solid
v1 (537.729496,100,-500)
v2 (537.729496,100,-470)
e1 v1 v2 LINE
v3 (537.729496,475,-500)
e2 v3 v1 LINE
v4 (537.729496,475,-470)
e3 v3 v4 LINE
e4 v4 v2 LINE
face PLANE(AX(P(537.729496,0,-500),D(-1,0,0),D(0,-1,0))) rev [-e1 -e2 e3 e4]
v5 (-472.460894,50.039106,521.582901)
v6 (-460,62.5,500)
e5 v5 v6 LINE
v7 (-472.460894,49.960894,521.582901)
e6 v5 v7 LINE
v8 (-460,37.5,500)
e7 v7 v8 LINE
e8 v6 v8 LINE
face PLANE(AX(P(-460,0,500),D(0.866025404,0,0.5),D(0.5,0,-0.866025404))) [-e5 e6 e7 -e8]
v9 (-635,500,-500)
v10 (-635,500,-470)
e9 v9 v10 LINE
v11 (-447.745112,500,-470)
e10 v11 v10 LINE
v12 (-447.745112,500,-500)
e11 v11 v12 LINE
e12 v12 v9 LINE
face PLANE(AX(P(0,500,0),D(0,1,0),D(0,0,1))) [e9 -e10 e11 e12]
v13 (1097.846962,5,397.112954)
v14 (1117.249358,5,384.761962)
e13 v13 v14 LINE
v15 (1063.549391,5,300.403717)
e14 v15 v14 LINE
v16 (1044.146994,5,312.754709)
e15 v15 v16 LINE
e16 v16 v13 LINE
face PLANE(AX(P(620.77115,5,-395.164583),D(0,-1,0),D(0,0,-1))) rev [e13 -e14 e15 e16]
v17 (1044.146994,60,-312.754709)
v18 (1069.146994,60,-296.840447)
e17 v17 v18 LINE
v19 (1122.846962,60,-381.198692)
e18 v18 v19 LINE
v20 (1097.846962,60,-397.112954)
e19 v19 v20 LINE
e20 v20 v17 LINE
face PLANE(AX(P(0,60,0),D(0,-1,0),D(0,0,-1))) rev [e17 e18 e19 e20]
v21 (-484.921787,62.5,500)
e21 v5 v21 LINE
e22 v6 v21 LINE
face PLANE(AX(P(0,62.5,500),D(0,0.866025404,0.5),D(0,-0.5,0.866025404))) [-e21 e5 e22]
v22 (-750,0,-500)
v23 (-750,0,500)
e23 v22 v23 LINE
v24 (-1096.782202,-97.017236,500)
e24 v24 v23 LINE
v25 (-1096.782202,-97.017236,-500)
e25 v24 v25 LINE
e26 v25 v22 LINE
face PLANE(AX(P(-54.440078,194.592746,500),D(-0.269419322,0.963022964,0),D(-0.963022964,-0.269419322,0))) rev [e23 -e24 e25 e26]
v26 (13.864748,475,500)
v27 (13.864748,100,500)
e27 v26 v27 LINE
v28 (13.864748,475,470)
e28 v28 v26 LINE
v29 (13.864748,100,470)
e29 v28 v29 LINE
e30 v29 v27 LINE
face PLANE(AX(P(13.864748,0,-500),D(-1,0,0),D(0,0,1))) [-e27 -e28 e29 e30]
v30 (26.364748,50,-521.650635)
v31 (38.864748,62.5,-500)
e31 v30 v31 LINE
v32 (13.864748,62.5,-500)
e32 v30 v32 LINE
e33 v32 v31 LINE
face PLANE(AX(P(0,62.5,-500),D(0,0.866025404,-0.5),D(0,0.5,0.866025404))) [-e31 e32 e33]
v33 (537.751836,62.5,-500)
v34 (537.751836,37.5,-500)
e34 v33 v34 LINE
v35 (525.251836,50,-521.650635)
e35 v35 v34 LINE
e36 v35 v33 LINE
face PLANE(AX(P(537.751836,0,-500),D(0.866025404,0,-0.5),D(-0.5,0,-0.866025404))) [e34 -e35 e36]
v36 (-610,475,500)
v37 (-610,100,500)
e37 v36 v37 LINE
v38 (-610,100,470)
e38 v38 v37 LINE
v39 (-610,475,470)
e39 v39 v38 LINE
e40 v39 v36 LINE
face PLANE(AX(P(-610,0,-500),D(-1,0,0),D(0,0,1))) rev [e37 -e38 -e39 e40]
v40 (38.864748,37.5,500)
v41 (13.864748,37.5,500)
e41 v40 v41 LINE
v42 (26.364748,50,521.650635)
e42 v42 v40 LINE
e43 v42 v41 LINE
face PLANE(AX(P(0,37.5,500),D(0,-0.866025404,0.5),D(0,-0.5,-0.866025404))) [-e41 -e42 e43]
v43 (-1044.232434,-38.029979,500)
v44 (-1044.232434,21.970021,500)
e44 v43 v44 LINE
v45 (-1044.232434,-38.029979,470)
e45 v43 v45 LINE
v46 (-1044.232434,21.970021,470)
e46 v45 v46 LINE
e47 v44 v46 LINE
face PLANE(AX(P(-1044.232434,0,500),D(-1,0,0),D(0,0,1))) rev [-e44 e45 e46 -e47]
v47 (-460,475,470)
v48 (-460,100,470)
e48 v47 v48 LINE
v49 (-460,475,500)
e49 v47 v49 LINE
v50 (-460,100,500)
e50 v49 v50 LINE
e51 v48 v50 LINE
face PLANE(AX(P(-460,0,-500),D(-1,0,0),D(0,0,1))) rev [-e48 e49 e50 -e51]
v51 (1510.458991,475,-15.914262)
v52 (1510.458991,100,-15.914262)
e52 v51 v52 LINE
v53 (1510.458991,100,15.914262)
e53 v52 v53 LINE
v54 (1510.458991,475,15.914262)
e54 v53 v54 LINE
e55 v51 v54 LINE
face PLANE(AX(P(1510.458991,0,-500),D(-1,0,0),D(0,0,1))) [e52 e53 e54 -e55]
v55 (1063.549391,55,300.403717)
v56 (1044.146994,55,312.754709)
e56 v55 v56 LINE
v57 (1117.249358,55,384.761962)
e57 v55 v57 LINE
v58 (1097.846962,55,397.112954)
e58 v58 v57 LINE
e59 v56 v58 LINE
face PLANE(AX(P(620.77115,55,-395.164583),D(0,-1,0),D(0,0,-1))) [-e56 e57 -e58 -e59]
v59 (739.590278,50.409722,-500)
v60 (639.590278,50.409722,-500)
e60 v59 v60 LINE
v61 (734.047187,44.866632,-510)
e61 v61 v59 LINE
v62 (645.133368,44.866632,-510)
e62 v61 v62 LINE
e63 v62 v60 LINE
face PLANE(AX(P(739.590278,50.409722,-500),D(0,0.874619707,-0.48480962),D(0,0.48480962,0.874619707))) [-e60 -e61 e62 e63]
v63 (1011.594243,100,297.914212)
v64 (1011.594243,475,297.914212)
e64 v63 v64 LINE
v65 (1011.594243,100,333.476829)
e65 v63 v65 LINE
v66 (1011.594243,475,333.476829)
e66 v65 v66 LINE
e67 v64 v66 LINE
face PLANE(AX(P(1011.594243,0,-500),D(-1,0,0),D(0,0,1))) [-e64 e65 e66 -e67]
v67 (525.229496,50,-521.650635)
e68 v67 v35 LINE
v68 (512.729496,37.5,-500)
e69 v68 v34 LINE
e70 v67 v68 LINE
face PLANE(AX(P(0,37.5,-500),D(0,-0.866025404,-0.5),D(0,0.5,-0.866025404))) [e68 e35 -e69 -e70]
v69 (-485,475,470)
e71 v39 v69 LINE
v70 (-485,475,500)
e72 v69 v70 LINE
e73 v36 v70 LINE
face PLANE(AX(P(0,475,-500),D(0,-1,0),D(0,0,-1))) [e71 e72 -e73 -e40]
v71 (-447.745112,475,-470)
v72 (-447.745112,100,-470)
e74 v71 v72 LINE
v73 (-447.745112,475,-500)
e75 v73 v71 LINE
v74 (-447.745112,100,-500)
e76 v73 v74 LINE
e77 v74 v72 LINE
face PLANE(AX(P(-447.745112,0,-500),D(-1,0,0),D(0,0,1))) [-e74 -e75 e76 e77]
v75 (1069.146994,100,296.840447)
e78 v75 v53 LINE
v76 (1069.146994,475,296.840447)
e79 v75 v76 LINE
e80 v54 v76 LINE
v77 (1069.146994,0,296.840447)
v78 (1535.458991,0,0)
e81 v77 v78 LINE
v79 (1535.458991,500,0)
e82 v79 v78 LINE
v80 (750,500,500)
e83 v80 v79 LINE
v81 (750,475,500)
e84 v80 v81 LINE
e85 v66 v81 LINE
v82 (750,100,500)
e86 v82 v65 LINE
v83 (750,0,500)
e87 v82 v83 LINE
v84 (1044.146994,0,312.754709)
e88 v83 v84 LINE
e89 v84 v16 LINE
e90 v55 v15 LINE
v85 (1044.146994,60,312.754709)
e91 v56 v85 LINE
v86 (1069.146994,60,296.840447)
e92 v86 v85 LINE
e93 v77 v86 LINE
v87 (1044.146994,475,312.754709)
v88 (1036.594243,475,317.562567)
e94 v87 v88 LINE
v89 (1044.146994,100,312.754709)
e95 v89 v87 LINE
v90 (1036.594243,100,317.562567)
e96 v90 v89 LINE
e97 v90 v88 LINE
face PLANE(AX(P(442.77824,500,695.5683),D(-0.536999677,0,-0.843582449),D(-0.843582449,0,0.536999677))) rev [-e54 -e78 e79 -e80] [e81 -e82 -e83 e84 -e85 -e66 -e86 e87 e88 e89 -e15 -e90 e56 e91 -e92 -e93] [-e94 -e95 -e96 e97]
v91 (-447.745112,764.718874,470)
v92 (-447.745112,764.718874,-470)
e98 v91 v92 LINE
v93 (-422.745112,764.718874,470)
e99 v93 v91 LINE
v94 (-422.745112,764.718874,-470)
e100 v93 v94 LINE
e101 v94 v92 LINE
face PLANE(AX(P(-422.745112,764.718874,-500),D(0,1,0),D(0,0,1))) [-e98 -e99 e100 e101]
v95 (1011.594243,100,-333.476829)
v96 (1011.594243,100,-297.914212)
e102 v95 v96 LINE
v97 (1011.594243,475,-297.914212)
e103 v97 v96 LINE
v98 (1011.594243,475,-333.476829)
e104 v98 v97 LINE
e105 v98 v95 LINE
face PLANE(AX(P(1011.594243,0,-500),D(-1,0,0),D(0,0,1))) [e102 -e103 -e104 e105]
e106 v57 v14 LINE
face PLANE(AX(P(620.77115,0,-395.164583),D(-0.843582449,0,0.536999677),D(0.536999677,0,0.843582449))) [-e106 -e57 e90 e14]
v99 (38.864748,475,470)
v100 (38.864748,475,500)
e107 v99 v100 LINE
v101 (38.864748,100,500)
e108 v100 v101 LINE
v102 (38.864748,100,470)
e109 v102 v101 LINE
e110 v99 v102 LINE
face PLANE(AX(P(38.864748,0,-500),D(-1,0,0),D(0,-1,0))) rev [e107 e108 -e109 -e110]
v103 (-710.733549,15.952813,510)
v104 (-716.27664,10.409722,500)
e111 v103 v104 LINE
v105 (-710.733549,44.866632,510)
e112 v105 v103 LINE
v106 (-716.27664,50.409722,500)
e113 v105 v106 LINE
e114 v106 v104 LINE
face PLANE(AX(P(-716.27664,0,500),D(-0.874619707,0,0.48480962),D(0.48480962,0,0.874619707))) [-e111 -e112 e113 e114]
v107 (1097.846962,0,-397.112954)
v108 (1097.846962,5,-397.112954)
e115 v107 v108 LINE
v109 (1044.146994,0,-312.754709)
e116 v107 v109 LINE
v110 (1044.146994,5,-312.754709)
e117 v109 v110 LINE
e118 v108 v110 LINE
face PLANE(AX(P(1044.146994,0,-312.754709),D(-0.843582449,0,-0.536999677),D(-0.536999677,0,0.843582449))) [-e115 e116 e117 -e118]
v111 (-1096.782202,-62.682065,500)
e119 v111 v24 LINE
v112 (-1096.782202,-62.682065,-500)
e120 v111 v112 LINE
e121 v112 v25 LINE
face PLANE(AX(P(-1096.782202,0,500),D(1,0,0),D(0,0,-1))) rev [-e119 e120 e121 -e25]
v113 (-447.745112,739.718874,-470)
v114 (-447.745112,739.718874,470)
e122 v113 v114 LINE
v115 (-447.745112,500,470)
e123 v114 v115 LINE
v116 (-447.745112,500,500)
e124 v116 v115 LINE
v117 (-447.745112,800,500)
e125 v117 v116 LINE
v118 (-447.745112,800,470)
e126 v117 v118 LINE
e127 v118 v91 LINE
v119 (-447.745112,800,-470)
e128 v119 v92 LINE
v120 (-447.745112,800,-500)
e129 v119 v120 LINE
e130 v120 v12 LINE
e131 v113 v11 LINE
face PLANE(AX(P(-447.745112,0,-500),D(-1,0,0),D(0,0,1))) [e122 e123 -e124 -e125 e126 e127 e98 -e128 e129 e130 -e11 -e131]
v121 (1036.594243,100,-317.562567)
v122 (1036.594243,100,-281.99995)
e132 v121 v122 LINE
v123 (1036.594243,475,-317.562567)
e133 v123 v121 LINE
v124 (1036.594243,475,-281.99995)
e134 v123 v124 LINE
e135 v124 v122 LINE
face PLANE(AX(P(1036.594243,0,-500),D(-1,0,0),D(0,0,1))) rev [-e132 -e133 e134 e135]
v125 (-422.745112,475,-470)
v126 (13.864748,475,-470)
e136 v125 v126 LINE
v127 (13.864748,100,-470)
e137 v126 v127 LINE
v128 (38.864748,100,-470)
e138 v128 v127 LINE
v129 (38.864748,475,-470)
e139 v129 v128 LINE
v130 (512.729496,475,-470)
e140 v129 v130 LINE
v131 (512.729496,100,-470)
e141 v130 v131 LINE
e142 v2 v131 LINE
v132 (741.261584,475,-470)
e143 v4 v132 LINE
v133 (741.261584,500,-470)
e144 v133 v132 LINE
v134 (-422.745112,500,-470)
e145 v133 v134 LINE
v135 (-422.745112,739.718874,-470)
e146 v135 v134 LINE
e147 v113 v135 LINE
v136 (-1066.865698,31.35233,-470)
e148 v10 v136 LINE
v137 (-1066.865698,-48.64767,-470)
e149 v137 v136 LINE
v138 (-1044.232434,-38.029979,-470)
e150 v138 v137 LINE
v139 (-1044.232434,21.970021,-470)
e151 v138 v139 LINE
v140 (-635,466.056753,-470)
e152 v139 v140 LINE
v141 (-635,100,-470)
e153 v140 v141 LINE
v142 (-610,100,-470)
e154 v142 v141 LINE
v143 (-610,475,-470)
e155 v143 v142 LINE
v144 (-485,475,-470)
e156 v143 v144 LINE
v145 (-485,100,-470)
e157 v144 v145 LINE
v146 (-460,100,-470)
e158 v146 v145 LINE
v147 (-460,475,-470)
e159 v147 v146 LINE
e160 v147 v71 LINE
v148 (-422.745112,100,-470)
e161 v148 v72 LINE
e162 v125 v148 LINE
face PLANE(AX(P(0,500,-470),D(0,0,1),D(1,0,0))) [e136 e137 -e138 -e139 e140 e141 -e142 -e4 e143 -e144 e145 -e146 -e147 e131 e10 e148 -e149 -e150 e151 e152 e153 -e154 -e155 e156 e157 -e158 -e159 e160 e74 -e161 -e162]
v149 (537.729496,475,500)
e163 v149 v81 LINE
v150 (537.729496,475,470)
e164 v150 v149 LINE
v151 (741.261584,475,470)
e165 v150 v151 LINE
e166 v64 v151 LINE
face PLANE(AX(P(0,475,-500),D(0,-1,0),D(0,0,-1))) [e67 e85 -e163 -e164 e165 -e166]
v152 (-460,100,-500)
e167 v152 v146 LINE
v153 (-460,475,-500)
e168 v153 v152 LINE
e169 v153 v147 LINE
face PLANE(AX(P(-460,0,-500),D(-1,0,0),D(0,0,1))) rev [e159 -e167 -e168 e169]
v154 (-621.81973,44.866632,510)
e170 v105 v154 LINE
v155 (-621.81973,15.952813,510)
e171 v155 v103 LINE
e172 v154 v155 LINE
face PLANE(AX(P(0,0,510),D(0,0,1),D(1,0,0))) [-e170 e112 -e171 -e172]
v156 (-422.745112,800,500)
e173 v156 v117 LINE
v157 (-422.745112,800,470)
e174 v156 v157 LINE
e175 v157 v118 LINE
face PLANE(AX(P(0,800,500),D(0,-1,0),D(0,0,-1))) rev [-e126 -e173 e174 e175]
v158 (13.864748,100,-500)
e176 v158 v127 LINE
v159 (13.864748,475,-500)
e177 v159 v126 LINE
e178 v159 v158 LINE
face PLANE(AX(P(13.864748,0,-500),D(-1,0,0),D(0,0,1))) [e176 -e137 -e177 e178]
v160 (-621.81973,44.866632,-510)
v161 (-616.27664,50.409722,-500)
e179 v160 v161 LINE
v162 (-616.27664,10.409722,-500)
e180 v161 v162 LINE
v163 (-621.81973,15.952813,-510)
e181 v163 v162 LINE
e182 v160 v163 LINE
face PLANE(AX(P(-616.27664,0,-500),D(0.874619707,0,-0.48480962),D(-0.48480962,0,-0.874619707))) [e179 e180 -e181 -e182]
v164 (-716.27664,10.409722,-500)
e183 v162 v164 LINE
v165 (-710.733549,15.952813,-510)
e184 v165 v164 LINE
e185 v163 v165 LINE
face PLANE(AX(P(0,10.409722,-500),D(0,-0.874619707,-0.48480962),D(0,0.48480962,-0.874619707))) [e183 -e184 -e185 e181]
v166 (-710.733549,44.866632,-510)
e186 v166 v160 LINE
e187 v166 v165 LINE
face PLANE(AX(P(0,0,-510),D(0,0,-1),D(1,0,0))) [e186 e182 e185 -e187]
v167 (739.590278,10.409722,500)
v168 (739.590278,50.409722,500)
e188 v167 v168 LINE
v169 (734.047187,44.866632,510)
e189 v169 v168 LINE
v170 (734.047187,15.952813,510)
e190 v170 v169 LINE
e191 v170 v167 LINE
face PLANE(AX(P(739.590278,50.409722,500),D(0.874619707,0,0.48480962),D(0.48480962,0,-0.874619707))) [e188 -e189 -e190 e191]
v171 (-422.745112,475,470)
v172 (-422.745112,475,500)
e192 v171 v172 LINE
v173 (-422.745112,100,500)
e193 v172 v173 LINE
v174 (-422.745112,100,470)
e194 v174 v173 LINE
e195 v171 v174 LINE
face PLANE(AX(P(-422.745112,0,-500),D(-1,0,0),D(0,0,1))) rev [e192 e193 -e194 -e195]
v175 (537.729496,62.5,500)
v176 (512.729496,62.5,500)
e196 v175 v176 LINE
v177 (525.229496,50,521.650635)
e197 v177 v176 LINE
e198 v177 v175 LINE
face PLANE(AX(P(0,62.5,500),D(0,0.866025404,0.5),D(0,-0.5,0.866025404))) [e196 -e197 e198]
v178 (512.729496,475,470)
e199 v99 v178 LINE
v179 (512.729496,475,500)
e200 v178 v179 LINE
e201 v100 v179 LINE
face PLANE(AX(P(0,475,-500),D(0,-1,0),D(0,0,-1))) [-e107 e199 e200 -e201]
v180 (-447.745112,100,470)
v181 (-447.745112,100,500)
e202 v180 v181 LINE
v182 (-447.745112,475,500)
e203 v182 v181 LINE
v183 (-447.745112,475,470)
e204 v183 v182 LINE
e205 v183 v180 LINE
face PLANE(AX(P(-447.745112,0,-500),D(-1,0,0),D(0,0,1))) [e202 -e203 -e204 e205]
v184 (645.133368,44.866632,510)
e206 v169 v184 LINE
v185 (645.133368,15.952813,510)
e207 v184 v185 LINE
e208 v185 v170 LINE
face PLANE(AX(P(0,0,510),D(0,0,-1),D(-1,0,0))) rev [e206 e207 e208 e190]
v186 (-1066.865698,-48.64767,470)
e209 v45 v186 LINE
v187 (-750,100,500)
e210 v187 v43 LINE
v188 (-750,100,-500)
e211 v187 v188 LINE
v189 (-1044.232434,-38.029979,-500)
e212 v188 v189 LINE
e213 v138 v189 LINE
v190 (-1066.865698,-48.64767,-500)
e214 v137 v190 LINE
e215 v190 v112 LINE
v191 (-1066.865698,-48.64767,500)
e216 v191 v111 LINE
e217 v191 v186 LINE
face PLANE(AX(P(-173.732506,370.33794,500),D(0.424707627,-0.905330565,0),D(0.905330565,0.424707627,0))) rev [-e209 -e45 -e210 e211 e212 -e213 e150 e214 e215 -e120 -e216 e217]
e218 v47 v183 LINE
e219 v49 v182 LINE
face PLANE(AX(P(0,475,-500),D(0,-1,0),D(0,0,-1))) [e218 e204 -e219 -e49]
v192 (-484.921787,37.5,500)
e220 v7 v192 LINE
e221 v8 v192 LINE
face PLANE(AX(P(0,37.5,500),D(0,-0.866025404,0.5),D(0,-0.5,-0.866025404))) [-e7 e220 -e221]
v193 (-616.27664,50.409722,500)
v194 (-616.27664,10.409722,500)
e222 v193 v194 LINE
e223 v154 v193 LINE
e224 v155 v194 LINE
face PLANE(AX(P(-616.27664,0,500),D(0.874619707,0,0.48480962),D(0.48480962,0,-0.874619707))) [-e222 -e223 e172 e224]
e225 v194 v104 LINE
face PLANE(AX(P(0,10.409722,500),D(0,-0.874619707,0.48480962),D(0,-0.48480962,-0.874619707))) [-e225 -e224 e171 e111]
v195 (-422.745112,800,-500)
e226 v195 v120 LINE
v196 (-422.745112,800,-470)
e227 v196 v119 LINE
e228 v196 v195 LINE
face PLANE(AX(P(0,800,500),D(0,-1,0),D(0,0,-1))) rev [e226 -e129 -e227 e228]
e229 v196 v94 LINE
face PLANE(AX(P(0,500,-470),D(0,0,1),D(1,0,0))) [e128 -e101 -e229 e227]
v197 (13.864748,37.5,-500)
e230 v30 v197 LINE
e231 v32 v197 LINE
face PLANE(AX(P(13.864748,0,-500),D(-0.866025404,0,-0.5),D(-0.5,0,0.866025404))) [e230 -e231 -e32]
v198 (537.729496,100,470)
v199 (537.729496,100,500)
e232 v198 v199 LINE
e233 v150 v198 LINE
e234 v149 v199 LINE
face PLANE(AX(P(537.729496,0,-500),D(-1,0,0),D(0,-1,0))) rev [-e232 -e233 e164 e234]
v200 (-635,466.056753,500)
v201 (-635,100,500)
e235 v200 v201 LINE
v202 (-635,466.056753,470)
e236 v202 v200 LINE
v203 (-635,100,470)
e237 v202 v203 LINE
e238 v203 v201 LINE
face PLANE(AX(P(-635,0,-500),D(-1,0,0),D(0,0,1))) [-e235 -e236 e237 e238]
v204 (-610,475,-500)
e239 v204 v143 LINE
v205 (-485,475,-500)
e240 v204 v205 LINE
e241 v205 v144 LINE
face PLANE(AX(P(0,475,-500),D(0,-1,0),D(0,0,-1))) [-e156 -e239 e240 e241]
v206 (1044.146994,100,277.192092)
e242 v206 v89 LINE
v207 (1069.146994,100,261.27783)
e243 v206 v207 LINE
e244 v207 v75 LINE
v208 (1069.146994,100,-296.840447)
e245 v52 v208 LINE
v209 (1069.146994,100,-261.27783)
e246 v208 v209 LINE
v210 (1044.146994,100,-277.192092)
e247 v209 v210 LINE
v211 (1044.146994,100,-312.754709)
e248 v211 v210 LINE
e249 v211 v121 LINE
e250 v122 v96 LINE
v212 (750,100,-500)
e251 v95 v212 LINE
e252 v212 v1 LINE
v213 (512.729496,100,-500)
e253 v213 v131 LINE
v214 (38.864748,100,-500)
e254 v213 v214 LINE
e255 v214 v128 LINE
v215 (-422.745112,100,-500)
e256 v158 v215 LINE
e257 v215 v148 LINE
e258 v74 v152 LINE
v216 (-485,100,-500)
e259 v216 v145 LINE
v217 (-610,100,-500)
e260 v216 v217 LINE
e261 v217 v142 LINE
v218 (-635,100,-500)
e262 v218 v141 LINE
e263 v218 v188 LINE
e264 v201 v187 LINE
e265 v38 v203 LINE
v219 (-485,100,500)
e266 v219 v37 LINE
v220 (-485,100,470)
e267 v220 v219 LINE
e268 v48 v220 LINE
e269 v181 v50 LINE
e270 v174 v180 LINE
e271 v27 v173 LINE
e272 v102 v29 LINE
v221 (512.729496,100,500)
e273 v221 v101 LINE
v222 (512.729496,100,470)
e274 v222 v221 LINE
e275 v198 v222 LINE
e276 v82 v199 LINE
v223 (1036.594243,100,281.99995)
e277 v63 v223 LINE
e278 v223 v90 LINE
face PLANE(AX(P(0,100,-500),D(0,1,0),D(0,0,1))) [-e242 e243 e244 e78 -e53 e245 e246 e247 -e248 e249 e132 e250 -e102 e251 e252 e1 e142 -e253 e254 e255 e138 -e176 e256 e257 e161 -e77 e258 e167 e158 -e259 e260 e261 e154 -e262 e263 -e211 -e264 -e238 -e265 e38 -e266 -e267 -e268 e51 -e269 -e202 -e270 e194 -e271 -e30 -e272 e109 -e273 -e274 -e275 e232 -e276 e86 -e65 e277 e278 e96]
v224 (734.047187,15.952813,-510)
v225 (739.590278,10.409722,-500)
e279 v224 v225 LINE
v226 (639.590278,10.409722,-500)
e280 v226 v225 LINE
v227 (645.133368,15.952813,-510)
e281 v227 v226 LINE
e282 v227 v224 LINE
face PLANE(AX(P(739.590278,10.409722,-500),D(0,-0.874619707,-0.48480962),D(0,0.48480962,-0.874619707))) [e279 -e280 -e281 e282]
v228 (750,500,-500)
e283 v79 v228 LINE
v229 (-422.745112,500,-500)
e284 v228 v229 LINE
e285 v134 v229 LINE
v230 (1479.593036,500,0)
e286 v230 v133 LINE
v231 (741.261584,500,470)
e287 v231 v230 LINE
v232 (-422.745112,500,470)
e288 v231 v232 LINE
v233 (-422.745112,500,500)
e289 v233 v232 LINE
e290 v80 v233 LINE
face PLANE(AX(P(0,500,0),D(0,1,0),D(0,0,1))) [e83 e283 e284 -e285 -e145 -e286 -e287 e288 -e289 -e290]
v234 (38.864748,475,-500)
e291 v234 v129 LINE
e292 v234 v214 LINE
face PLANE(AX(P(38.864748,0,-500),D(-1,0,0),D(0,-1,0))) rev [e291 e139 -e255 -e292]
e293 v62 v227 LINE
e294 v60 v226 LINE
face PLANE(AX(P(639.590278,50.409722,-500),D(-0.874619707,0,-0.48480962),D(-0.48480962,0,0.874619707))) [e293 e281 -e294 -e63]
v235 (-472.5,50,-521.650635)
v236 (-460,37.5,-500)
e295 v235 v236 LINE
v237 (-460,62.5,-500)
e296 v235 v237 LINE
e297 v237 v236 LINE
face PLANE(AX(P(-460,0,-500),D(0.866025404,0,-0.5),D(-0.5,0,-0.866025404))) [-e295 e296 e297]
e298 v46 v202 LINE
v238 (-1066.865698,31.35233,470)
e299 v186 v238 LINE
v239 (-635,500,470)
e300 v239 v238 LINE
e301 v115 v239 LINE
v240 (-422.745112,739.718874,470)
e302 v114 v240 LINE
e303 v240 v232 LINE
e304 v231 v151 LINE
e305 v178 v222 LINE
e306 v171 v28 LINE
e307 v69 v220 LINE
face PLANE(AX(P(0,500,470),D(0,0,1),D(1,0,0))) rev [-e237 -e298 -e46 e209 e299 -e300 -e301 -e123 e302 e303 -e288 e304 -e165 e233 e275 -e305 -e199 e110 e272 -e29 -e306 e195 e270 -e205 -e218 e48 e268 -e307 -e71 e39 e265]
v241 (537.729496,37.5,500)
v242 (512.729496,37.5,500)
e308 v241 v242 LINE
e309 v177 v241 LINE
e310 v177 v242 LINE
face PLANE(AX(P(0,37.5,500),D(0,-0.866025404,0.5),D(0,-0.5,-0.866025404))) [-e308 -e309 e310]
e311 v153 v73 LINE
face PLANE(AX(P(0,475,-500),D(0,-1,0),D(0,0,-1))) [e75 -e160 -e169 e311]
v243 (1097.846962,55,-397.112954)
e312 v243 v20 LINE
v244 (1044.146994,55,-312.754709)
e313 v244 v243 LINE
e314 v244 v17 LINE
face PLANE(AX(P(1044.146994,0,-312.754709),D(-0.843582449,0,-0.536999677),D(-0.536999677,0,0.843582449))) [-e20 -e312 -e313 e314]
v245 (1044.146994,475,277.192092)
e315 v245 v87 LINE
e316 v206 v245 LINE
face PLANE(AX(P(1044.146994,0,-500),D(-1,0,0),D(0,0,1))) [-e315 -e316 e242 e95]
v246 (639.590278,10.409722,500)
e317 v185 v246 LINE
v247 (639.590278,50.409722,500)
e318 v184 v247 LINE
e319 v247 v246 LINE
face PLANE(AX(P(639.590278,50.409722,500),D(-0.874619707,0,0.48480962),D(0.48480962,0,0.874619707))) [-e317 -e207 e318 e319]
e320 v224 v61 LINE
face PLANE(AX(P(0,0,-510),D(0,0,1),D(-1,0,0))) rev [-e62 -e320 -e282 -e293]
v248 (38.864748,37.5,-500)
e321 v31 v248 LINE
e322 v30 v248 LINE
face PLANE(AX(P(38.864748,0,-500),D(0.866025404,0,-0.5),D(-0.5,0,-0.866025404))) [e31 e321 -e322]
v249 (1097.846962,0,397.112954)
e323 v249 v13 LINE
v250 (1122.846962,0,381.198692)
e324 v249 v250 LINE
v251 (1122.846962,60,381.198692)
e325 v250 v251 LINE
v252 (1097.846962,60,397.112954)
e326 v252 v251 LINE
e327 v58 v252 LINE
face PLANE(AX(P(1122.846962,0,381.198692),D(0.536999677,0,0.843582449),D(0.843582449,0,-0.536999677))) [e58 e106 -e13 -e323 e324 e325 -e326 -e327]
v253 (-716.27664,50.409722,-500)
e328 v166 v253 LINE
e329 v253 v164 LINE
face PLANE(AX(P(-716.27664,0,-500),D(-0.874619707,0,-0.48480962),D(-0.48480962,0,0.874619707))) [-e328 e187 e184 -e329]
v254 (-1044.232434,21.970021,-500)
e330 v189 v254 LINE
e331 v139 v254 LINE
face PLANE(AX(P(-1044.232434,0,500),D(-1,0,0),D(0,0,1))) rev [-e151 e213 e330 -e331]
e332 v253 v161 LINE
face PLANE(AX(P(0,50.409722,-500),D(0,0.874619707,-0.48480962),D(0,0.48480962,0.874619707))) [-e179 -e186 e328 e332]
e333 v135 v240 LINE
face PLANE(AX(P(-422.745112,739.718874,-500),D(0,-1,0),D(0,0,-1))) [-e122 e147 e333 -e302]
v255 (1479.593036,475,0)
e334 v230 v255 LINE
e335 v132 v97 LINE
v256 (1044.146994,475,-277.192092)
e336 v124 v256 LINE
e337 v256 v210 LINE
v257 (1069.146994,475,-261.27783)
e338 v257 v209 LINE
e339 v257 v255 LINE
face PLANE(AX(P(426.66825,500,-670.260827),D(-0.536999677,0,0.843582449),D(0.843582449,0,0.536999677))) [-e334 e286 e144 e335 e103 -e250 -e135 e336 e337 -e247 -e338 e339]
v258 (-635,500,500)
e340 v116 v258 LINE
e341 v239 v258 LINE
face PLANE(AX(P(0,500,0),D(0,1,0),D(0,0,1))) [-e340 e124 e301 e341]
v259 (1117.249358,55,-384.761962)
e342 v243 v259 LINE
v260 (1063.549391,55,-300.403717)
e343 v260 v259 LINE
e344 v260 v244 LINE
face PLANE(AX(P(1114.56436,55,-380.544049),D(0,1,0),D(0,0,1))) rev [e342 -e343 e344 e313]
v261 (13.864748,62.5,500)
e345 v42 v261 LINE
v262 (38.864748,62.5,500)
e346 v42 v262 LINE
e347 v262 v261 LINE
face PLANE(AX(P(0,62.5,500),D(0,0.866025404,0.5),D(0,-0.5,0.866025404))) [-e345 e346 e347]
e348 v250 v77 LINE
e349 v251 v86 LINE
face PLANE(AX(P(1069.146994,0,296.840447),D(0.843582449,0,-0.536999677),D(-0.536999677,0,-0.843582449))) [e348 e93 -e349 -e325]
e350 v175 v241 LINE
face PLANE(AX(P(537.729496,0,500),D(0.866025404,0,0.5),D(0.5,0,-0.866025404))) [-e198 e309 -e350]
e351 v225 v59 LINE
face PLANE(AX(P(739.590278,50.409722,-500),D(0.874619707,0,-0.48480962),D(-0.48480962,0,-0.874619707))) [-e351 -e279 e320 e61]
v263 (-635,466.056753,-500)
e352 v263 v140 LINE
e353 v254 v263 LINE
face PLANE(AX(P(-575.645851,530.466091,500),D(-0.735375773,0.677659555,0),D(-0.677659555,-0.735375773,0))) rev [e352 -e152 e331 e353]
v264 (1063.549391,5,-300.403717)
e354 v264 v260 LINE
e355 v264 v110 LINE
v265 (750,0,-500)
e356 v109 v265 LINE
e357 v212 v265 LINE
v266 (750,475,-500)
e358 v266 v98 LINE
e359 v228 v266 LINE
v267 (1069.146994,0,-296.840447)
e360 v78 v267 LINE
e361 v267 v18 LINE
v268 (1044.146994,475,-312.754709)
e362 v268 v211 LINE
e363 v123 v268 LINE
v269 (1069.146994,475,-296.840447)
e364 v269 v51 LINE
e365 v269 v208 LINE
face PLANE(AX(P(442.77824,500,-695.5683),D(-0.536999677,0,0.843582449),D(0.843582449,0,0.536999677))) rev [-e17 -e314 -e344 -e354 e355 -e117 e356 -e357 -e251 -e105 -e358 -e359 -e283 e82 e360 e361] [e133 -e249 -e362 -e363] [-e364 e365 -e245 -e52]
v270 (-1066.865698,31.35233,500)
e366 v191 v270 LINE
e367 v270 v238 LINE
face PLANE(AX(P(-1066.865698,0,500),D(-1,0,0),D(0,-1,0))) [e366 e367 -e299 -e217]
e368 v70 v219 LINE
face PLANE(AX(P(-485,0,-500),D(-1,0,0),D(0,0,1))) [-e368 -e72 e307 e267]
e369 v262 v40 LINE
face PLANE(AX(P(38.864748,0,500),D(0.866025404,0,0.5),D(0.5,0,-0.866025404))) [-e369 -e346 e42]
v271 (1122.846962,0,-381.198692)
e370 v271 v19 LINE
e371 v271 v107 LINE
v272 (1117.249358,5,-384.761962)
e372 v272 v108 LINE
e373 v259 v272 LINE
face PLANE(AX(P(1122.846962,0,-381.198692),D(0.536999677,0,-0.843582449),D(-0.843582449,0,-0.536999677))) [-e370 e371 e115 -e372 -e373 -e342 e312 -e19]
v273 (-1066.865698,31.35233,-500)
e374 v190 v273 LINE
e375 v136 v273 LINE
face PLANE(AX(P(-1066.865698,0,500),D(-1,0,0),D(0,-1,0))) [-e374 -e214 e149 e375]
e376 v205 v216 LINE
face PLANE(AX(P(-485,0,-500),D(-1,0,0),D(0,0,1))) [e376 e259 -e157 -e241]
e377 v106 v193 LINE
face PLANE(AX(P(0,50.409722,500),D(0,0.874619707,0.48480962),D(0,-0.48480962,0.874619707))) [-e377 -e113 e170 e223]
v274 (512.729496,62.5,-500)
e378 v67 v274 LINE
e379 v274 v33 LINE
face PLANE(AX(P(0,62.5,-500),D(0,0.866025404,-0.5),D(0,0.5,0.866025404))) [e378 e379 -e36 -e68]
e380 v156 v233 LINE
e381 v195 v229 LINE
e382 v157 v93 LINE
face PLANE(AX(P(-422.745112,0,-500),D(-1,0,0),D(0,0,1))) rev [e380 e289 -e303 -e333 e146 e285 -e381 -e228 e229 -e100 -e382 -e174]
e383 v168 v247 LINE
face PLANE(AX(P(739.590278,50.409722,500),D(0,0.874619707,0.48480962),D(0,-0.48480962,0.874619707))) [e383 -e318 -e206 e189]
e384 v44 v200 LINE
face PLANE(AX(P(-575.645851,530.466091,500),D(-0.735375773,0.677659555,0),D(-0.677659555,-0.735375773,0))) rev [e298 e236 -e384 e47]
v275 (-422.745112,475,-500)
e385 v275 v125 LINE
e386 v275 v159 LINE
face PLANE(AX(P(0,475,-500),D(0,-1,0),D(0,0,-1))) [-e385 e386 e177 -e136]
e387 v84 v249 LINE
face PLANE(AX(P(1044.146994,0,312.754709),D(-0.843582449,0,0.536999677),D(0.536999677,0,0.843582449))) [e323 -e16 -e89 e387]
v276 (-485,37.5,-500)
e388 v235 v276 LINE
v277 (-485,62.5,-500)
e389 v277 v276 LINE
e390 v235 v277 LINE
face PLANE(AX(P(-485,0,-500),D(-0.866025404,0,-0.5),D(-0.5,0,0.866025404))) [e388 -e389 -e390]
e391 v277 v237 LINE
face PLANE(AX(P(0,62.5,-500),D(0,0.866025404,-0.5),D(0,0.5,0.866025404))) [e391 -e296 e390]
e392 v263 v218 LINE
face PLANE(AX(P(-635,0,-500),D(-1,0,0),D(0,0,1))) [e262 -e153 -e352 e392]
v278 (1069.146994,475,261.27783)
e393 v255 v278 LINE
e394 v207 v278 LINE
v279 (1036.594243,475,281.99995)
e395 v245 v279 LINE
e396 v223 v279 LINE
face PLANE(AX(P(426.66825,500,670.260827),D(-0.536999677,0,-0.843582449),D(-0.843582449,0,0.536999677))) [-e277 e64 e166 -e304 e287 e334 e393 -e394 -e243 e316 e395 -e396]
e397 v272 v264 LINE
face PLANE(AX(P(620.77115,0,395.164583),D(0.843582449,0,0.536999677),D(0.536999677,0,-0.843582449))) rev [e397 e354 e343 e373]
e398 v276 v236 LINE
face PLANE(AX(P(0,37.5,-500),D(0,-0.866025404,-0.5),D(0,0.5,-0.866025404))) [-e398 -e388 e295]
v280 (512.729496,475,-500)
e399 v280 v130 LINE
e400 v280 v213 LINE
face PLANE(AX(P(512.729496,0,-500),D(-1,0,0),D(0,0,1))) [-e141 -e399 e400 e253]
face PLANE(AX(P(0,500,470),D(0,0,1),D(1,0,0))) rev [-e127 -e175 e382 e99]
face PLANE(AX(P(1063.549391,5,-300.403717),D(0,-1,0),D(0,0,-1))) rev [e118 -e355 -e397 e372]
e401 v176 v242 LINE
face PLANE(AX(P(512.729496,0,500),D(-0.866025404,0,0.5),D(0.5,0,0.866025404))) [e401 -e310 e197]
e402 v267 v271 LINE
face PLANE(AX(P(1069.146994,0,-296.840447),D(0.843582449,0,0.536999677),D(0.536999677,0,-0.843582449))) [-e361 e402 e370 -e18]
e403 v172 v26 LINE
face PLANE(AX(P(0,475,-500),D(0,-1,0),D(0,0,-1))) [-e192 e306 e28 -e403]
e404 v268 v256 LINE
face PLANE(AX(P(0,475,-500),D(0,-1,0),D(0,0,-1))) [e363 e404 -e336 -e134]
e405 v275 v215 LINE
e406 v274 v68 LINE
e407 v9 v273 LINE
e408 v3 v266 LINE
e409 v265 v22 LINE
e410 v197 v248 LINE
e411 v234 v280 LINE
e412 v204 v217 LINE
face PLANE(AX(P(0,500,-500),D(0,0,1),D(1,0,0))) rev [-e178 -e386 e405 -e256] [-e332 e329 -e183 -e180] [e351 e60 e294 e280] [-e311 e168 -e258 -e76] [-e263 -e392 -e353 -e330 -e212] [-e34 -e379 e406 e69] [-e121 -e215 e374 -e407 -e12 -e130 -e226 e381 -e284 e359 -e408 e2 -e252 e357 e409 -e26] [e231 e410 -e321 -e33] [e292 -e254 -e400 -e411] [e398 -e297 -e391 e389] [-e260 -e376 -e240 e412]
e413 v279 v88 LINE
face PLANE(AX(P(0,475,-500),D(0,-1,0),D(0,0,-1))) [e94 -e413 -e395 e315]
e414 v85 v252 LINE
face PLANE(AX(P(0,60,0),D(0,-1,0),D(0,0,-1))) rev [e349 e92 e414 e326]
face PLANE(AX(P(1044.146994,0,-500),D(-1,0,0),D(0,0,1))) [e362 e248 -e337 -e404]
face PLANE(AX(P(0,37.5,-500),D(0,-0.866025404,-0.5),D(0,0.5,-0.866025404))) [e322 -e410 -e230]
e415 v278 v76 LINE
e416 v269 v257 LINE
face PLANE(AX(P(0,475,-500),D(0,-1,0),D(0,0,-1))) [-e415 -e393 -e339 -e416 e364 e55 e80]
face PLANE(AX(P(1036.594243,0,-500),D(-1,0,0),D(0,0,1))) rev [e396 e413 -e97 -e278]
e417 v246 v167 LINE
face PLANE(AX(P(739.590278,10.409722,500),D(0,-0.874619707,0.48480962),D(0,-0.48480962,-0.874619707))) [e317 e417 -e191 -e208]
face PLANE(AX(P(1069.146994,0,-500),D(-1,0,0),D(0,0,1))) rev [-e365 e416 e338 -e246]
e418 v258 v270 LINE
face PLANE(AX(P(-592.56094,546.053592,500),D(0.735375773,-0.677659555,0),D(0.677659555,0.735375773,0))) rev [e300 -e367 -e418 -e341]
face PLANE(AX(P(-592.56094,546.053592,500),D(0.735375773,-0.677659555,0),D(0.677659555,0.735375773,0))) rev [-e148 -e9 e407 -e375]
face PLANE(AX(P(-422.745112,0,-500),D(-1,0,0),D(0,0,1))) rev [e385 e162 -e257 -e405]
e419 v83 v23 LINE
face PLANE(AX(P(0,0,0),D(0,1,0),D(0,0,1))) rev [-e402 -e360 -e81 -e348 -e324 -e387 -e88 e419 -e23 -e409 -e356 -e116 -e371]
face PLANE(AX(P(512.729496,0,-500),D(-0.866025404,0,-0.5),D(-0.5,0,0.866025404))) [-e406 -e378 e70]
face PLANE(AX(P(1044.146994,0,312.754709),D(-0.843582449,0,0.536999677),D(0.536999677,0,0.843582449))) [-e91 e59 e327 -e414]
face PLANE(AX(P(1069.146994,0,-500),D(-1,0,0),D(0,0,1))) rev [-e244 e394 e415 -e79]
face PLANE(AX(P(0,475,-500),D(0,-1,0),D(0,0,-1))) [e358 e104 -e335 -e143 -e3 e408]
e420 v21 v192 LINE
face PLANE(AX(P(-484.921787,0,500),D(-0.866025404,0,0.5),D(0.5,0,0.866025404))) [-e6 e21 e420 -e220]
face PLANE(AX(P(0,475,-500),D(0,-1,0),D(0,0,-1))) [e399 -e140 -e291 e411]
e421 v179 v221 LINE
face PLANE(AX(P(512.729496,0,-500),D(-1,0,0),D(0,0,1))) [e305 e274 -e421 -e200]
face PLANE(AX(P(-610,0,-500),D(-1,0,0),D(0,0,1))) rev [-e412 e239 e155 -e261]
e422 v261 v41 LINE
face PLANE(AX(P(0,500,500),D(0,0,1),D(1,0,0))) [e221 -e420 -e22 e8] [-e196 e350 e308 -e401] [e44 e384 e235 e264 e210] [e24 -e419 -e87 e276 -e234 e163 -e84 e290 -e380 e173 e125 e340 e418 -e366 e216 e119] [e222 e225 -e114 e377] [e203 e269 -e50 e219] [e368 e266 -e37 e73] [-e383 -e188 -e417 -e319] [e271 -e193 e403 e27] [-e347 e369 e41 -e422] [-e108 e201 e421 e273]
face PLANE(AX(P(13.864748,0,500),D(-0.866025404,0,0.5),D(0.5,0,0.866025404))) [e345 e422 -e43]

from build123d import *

# Parameters (mm, degrees)
BOSS_EXTRUDE1_DEPTH      = 500
BOSS_EXTRUDE2_DEPTH      = 500
BOSS_EXTRUDE2_DEPTH_BACK = 500
CUT_EXTRUDE1_START       = -500
CUT_EXTRUDE1_OUTLINE_W   = 473.864747831
CUT_EXTRUDE1_OUTLINE_H   = 375
CUT_EXTRUDE1_OUTLINE_W_2 = 7.552750907
CUT_EXTRUDE1_OUTLINE_W_3 = 441.311996924
CUT_EXTRUDE1_OUTLINE_W_4 = 436.609859473
CUT_EXTRUDE1_OUTLINE_W_5 = 473.864747832
CUT_EXTRUDE1_OUTLINE_W_6 = 12.254888358
CUT_EXTRUDE1_OUTLINE_W_7 = 125
CUT_EXTRUDE1_DEPTH       = 1000
BOSS_EXTRUDE3_DEPTH      = 100
CUT_EXTRUDE4_DEPTH       = 470
BOSS_EXTRUDE5_DEPTH      = 500
BOSS_EXTRUDE5_DEPTH_BACK = 500
CUT_EXTRUDE7_DEPTH       = 470
SKETCH10_W               = 1000
SKETCH10_H               = 25
BOSS_EXTRUDE6_DEPTH      = 25
SKETCH11_W               = 25
SKETCH11_H               = 25
SKETCH11_W_2             = 24.921787331
BOSS_EXTRUDE7_DEPTH      = 25
BOSS_EXTRUDE7_TAPER      = 30
BOSS_EXTRUDE8_START      = 525.229495663
BOSS_EXTRUDE8_DEPTH      = 0.022340747
BOSS_EXTRUDE8_START_2    = -485
BOSS_EXTRUDE8_2_DEPTH    = 25
BOSS_EXTRUDE8_START_3    = 13.864747831
BOSS_EXTRUDE8_3_DEPTH    = 25
BOSS_EXTRUDE8_START_4    = 512.729495663
BOSS_EXTRUDE8_4_DEPTH    = 25.022340747
BOSS_EXTRUDE8_START_5    = 37
BOSS_EXTRUDE8_5_DEPTH    = 26
BOSS_EXTRUDE10_DEPTH     = 500
CUT_EXTRUDE8_DEPTH       = 440
CUT_EXTRUDE9_DEPTH       = 23
CUT_EXTRUDE10_DEPTH      = 23
SKETCH20_W               = 100
SKETCH20_H               = 40
BOSS_EXTRUDE11_DEPTH     = 10
BOSS_EXTRUDE11_TAPER     = 29
SKETCH22_W               = 100
SKETCH22_H               = 40
BOSS_EXTRUDE12_DEPTH     = 10
BOSS_EXTRUDE12_TAPER     = 29


with BuildPart() as part:
    # Sketch3 → Boss-Extrude1 (new body)
    with BuildSketch(Plane(origin=(0, 0, 0), x_dir=(1, 0, 0), z_dir=(0, 1, 0))):
        Polygon((750, -500), (1535.458991325, 0), (750, 500), (-750, 500), (-750, -500), align=None)
        Polygon((741.261584038, -470), (1479.593035884, 0), (741.261584038, 470), (-720, 470), (-720, -470), align=None, mode=Mode.SUBTRACT)
    extrude(amount=BOSS_EXTRUDE1_DEPTH)

    # Sketch4 → Boss-Extrude2 (add, two sides: drawn at the far end of the back side and taken through both)
    with BuildSketch(Plane.XY.offset(-BOSS_EXTRUDE2_DEPTH_BACK)):
        Polygon((-750, 0), (-750, 100), (-1044.23243351, -38.029978885), (-1044.23243351, 21.970021115), (-635, 466.05675301), (-635, 500), (-1066.865697626, 31.352330432), (-1066.865697626, -48.647669568), (-1096.782201963, -62.68206548), (-1096.782201963, -97.017235637), align=None)
    extrude(amount=BOSS_EXTRUDE2_DEPTH + BOSS_EXTRUDE2_DEPTH_BACK)

    # Cut-Extrude1: read off the stored shape, not the designer's step
    # Cut-Extrude1 outline → Cut-Extrude1 (cut)
    with BuildSketch(Plane.XY.offset(CUT_EXTRUDE1_START)):
        Polygon((-635, 100), (-635, 466.05675301), (-750, 341.262210872), (-750, 100), align=None)
        with Locations((774.661869579, 287.5)):
            Rectangle(CUT_EXTRUDE1_OUTLINE_W, CUT_EXTRUDE1_OUTLINE_H)
        with Locations((1040.370618948, 287.5)):
            Rectangle(CUT_EXTRUDE1_OUTLINE_W_2, CUT_EXTRUDE1_OUTLINE_H)
        with Locations((1289.802992863, 287.5)):
            Rectangle(CUT_EXTRUDE1_OUTLINE_W_3, CUT_EXTRUDE1_OUTLINE_H)
        with Locations((-204.440181906, 287.5)):
            Rectangle(CUT_EXTRUDE1_OUTLINE_W_4, CUT_EXTRUDE1_OUTLINE_H)
        with Locations((275.797121747, 287.5)):
            Rectangle(CUT_EXTRUDE1_OUTLINE_W_5, CUT_EXTRUDE1_OUTLINE_H)
        with Locations((-453.872555821, 287.5)):
            Rectangle(CUT_EXTRUDE1_OUTLINE_W_6, CUT_EXTRUDE1_OUTLINE_H)
        with Locations((-547.5, 287.5)):
            Rectangle(CUT_EXTRUDE1_OUTLINE_W_7, CUT_EXTRUDE1_OUTLINE_H)
        Polygon((-750, 375.205457862), (-635, 500), (-750, 500), align=None)
    extrude(amount=CUT_EXTRUDE1_DEPTH, mode=Mode.SUBTRACT)

    # Sketch3<6> → Boss-Extrude3 (add)
    with BuildSketch(Plane(origin=(0, 0, 0), x_dir=(1, 0, 0), z_dir=(0, 1, 0))):
        Polygon((750, -500), (1535.458991325, 0), (750, 500), (-750, 500), (-750, -500), align=None)
    extrude(amount=BOSS_EXTRUDE3_DEPTH)

    # Sketch4<6> → Cut-Extrude4 (cut, symmetric)
    with BuildSketch(Plane.XY):
        Polygon((-1066.865697626, -48.647669568), (-1044.23243351, -38.029978885), (-1044.23243351, 21.970021115), (-750, 341.262210872), (-635, 466.05675301), (-635, 500), (-750, 375.205457862), (-1066.865697626, 31.352330432), align=None)
    extrude(amount=CUT_EXTRUDE4_DEPTH, both=True, mode=Mode.SUBTRACT)

    # Sketch4<7> → Boss-Extrude5 (add, two sides: drawn at the far end of the back side and taken through both)
    with BuildSketch(Plane.XY.offset(-BOSS_EXTRUDE5_DEPTH_BACK)):
        Polygon((-447.745111642, 475), (-447.745111642, 100), (-422.745111642, 100), (-422.745111642, 475), (-422.745111642, 500), (-422.745111642, 800), (-447.745111642, 800), (-447.745111642, 500), align=None)
    extrude(amount=BOSS_EXTRUDE5_DEPTH + BOSS_EXTRUDE5_DEPTH_BACK)

    # Sketch4<8> → Cut-Extrude7 (cut, symmetric)
    with BuildSketch(Plane.XY):
        Polygon((-447.745111642, 475), (-447.745111642, 100), (-422.745111642, 100), (-422.745111642, 475), (-422.745111642, 500), (-422.745111642, 800), (-447.745111642, 800), (-447.745111642, 500), align=None)
    extrude(amount=CUT_EXTRUDE7_DEPTH, both=True, mode=Mode.SUBTRACT)

    # Sketch10 → Boss-Extrude6 (add)
    with BuildSketch(Plane.ZY.offset(447.745111642)):
        with Locations((0, 752.218873566)):
            Rectangle(SKETCH10_W, SKETCH10_H)
    extrude(amount=-BOSS_EXTRUDE6_DEPTH)

    # Sketch11 → Boss-Extrude7 (add)
    with BuildSketch(Plane.XY.offset(500)):
        with Locations((525.229495663, 50)):
            Rectangle(SKETCH11_W, SKETCH11_H)
        with Locations((26.364747831, 50)):
            Rectangle(SKETCH11_W, SKETCH11_H)
        with Locations((-472.460893666, 50)):
            Rectangle(SKETCH11_W_2, SKETCH11_H)
    extrude(amount=BOSS_EXTRUDE7_DEPTH, taper=BOSS_EXTRUDE7_TAPER)

    # Boss-Extrude8: read off the stored shape, not the designer's step
    # Boss-Extrude8 outline → Boss-Extrude8 (add)
    with BuildSketch(Plane.YZ.offset(BOSS_EXTRUDE8_START)):
        Polygon((62.5, -500), (37.5, -500), (50, -521.650635095), align=None)
    extrude(amount=BOSS_EXTRUDE8_DEPTH)

    # Boss-Extrude8 2 outline → Boss-Extrude8 2 (add)
    with BuildSketch(Plane.YZ.offset(BOSS_EXTRUDE8_START_2)):
        Polygon((62.5, -500), (37.5, -500), (50, -521.650635095), align=None)
    extrude(amount=BOSS_EXTRUDE8_2_DEPTH)

    # Boss-Extrude8 3 outline → Boss-Extrude8 3 (add)
    with BuildSketch(Plane.YZ.offset(BOSS_EXTRUDE8_START_3)):
        Polygon((62.5, -500), (37.5, -500), (50, -521.650635095), align=None)
    extrude(amount=BOSS_EXTRUDE8_3_DEPTH)

    # Boss-Extrude8 4 outline → Boss-Extrude8 4 (add)
    with BuildSketch(Plane.YZ.offset(BOSS_EXTRUDE8_START_4)):
        Polygon((62.5, -500), (37.5, -500), (50, -521.650635095), align=None)
    extrude(amount=BOSS_EXTRUDE8_4_DEPTH)

    # Boss-Extrude8 5 outline → Boss-Extrude8 5 (cut)
    with BuildSketch(Plane(origin=(0, 0, 0), x_dir=(1, 0, 0), z_dir=(0, 1, 0)).offset(BOSS_EXTRUDE8_START_5)):
        Polygon((512.729495663, 500), (525.229495663, 521.650635095), (525.240666036, 521.669982749), (524.472780219, 523), (512.729495663, 523), align=None)
        Polygon((526.008551854, 523), (525.240666036, 521.669982749), (525.25183641, 521.650635095), (537.75183641, 500), (537.75183641, 523), align=None)
        Polygon((38.864747831, 500), (38.864747831, 523), (13.864747831, 523), (13.864747831, 500), (26.364747831, 521.650635095), align=None)
        Polygon((-460, 500), (-460, 523), (-485, 523), (-485, 500), (-472.5, 521.650635095), align=None)
    extrude(amount=BOSS_EXTRUDE8_5_DEPTH, mode=Mode.SUBTRACT)

    # Sketch15 → Boss-Extrude10 (add)
    with BuildSketch(Plane(origin=(0, 500, 0), x_dir=(1, 0, 0), z_dir=(0, 1, 0))):
        Polygon((1069.146994401, -296.84044748), (1044.146994401, -312.754709253), (1097.846962052, -397.112954104), (1122.846962052, -381.198692331), align=None)
        Polygon((1044.146994401, 312.754709253), (1097.846962052, 397.112954104), (1122.846962052, 381.198692331), (1069.146994401, 296.84044748), align=None)
    extrude(amount=-BOSS_EXTRUDE10_DEPTH)

    # Sketch15<2> → Cut-Extrude8 (cut)
    with BuildSketch(Plane(origin=(0, 500, 0), x_dir=(1, 0, 0), z_dir=(0, 1, 0))):
        Polygon((1069.146994401, -296.84044748), (1044.146994401, -312.754709253), (1097.846962052, -397.112954104), (1122.846962052, -381.198692331), align=None)
        Polygon((1044.146994401, 312.754709253), (1097.846962052, 397.112954104), (1122.846962052, 381.198692331), (1069.146994401, 296.84044748), align=None)
    extrude(amount=-CUT_EXTRUDE8_DEPTH, mode=Mode.SUBTRACT)

    # Sketch17 → Cut-Extrude9 (cut)
    with BuildSketch(Plane(origin=(601.368753994, 0, -382.813590929), x_dir=(0.5369996765096833, 0, 0.8435824485066624), z_dir=(-0.8435824485066624, 0, 0.5369996765096833))):
        Polygon((824.540981636, 5), (919.540981636, 5), (968.552500425, 5), (968.552500425, 55), (924.540981636, 55), (824.540981636, 55), align=None)
    extrude(amount=-CUT_EXTRUDE9_DEPTH, mode=Mode.SUBTRACT)

    # Sketch19 → Cut-Extrude10 (cut)
    with BuildSketch(Plane(origin=(601.368753994, 0, 382.813590929), x_dir=(-0.5369996765096847, 0, 0.8435824485066614), z_dir=(-0.8435824485066615, 0, -0.5369996765096847))):
        Polygon((-829.540981636, 55), (-824.540981636, 55), (-824.540981636, 5), (-829.540981636, 5), (-919.540981636, 5), (-930.414815986, 5), (-930.414815986, 55), (-919.540981636, 55), align=None)
    extrude(amount=-CUT_EXTRUDE10_DEPTH, mode=Mode.SUBTRACT)

    # Sketch20 → Boss-Extrude11 (add)
    with BuildSketch(Plane.XY.offset(500)):
        with Locations((689.590277632, 30.409722368)):
            Rectangle(SKETCH20_W, SKETCH20_H)
    boss_extrude11 = extrude(amount=BOSS_EXTRUDE11_DEPTH, taper=BOSS_EXTRUDE11_TAPER)

    # Mirror1: Boss-Extrude11 across plane
    add(boss_extrude11.mirror(Plane.XY))

    # Sketch22 → Boss-Extrude12 (add)
    with BuildSketch(Plane.XY.offset(500)):
        with Locations((-666.276639524, 30.409722368)):
            Rectangle(SKETCH22_W, SKETCH22_H)
    boss_extrude12 = extrude(amount=BOSS_EXTRUDE12_DEPTH, taper=BOSS_EXTRUDE12_TAPER)

    # Mirror2: Boss-Extrude12 across plane
    add(boss_extrude12.mirror(Plane.XY))


solid = part.part
